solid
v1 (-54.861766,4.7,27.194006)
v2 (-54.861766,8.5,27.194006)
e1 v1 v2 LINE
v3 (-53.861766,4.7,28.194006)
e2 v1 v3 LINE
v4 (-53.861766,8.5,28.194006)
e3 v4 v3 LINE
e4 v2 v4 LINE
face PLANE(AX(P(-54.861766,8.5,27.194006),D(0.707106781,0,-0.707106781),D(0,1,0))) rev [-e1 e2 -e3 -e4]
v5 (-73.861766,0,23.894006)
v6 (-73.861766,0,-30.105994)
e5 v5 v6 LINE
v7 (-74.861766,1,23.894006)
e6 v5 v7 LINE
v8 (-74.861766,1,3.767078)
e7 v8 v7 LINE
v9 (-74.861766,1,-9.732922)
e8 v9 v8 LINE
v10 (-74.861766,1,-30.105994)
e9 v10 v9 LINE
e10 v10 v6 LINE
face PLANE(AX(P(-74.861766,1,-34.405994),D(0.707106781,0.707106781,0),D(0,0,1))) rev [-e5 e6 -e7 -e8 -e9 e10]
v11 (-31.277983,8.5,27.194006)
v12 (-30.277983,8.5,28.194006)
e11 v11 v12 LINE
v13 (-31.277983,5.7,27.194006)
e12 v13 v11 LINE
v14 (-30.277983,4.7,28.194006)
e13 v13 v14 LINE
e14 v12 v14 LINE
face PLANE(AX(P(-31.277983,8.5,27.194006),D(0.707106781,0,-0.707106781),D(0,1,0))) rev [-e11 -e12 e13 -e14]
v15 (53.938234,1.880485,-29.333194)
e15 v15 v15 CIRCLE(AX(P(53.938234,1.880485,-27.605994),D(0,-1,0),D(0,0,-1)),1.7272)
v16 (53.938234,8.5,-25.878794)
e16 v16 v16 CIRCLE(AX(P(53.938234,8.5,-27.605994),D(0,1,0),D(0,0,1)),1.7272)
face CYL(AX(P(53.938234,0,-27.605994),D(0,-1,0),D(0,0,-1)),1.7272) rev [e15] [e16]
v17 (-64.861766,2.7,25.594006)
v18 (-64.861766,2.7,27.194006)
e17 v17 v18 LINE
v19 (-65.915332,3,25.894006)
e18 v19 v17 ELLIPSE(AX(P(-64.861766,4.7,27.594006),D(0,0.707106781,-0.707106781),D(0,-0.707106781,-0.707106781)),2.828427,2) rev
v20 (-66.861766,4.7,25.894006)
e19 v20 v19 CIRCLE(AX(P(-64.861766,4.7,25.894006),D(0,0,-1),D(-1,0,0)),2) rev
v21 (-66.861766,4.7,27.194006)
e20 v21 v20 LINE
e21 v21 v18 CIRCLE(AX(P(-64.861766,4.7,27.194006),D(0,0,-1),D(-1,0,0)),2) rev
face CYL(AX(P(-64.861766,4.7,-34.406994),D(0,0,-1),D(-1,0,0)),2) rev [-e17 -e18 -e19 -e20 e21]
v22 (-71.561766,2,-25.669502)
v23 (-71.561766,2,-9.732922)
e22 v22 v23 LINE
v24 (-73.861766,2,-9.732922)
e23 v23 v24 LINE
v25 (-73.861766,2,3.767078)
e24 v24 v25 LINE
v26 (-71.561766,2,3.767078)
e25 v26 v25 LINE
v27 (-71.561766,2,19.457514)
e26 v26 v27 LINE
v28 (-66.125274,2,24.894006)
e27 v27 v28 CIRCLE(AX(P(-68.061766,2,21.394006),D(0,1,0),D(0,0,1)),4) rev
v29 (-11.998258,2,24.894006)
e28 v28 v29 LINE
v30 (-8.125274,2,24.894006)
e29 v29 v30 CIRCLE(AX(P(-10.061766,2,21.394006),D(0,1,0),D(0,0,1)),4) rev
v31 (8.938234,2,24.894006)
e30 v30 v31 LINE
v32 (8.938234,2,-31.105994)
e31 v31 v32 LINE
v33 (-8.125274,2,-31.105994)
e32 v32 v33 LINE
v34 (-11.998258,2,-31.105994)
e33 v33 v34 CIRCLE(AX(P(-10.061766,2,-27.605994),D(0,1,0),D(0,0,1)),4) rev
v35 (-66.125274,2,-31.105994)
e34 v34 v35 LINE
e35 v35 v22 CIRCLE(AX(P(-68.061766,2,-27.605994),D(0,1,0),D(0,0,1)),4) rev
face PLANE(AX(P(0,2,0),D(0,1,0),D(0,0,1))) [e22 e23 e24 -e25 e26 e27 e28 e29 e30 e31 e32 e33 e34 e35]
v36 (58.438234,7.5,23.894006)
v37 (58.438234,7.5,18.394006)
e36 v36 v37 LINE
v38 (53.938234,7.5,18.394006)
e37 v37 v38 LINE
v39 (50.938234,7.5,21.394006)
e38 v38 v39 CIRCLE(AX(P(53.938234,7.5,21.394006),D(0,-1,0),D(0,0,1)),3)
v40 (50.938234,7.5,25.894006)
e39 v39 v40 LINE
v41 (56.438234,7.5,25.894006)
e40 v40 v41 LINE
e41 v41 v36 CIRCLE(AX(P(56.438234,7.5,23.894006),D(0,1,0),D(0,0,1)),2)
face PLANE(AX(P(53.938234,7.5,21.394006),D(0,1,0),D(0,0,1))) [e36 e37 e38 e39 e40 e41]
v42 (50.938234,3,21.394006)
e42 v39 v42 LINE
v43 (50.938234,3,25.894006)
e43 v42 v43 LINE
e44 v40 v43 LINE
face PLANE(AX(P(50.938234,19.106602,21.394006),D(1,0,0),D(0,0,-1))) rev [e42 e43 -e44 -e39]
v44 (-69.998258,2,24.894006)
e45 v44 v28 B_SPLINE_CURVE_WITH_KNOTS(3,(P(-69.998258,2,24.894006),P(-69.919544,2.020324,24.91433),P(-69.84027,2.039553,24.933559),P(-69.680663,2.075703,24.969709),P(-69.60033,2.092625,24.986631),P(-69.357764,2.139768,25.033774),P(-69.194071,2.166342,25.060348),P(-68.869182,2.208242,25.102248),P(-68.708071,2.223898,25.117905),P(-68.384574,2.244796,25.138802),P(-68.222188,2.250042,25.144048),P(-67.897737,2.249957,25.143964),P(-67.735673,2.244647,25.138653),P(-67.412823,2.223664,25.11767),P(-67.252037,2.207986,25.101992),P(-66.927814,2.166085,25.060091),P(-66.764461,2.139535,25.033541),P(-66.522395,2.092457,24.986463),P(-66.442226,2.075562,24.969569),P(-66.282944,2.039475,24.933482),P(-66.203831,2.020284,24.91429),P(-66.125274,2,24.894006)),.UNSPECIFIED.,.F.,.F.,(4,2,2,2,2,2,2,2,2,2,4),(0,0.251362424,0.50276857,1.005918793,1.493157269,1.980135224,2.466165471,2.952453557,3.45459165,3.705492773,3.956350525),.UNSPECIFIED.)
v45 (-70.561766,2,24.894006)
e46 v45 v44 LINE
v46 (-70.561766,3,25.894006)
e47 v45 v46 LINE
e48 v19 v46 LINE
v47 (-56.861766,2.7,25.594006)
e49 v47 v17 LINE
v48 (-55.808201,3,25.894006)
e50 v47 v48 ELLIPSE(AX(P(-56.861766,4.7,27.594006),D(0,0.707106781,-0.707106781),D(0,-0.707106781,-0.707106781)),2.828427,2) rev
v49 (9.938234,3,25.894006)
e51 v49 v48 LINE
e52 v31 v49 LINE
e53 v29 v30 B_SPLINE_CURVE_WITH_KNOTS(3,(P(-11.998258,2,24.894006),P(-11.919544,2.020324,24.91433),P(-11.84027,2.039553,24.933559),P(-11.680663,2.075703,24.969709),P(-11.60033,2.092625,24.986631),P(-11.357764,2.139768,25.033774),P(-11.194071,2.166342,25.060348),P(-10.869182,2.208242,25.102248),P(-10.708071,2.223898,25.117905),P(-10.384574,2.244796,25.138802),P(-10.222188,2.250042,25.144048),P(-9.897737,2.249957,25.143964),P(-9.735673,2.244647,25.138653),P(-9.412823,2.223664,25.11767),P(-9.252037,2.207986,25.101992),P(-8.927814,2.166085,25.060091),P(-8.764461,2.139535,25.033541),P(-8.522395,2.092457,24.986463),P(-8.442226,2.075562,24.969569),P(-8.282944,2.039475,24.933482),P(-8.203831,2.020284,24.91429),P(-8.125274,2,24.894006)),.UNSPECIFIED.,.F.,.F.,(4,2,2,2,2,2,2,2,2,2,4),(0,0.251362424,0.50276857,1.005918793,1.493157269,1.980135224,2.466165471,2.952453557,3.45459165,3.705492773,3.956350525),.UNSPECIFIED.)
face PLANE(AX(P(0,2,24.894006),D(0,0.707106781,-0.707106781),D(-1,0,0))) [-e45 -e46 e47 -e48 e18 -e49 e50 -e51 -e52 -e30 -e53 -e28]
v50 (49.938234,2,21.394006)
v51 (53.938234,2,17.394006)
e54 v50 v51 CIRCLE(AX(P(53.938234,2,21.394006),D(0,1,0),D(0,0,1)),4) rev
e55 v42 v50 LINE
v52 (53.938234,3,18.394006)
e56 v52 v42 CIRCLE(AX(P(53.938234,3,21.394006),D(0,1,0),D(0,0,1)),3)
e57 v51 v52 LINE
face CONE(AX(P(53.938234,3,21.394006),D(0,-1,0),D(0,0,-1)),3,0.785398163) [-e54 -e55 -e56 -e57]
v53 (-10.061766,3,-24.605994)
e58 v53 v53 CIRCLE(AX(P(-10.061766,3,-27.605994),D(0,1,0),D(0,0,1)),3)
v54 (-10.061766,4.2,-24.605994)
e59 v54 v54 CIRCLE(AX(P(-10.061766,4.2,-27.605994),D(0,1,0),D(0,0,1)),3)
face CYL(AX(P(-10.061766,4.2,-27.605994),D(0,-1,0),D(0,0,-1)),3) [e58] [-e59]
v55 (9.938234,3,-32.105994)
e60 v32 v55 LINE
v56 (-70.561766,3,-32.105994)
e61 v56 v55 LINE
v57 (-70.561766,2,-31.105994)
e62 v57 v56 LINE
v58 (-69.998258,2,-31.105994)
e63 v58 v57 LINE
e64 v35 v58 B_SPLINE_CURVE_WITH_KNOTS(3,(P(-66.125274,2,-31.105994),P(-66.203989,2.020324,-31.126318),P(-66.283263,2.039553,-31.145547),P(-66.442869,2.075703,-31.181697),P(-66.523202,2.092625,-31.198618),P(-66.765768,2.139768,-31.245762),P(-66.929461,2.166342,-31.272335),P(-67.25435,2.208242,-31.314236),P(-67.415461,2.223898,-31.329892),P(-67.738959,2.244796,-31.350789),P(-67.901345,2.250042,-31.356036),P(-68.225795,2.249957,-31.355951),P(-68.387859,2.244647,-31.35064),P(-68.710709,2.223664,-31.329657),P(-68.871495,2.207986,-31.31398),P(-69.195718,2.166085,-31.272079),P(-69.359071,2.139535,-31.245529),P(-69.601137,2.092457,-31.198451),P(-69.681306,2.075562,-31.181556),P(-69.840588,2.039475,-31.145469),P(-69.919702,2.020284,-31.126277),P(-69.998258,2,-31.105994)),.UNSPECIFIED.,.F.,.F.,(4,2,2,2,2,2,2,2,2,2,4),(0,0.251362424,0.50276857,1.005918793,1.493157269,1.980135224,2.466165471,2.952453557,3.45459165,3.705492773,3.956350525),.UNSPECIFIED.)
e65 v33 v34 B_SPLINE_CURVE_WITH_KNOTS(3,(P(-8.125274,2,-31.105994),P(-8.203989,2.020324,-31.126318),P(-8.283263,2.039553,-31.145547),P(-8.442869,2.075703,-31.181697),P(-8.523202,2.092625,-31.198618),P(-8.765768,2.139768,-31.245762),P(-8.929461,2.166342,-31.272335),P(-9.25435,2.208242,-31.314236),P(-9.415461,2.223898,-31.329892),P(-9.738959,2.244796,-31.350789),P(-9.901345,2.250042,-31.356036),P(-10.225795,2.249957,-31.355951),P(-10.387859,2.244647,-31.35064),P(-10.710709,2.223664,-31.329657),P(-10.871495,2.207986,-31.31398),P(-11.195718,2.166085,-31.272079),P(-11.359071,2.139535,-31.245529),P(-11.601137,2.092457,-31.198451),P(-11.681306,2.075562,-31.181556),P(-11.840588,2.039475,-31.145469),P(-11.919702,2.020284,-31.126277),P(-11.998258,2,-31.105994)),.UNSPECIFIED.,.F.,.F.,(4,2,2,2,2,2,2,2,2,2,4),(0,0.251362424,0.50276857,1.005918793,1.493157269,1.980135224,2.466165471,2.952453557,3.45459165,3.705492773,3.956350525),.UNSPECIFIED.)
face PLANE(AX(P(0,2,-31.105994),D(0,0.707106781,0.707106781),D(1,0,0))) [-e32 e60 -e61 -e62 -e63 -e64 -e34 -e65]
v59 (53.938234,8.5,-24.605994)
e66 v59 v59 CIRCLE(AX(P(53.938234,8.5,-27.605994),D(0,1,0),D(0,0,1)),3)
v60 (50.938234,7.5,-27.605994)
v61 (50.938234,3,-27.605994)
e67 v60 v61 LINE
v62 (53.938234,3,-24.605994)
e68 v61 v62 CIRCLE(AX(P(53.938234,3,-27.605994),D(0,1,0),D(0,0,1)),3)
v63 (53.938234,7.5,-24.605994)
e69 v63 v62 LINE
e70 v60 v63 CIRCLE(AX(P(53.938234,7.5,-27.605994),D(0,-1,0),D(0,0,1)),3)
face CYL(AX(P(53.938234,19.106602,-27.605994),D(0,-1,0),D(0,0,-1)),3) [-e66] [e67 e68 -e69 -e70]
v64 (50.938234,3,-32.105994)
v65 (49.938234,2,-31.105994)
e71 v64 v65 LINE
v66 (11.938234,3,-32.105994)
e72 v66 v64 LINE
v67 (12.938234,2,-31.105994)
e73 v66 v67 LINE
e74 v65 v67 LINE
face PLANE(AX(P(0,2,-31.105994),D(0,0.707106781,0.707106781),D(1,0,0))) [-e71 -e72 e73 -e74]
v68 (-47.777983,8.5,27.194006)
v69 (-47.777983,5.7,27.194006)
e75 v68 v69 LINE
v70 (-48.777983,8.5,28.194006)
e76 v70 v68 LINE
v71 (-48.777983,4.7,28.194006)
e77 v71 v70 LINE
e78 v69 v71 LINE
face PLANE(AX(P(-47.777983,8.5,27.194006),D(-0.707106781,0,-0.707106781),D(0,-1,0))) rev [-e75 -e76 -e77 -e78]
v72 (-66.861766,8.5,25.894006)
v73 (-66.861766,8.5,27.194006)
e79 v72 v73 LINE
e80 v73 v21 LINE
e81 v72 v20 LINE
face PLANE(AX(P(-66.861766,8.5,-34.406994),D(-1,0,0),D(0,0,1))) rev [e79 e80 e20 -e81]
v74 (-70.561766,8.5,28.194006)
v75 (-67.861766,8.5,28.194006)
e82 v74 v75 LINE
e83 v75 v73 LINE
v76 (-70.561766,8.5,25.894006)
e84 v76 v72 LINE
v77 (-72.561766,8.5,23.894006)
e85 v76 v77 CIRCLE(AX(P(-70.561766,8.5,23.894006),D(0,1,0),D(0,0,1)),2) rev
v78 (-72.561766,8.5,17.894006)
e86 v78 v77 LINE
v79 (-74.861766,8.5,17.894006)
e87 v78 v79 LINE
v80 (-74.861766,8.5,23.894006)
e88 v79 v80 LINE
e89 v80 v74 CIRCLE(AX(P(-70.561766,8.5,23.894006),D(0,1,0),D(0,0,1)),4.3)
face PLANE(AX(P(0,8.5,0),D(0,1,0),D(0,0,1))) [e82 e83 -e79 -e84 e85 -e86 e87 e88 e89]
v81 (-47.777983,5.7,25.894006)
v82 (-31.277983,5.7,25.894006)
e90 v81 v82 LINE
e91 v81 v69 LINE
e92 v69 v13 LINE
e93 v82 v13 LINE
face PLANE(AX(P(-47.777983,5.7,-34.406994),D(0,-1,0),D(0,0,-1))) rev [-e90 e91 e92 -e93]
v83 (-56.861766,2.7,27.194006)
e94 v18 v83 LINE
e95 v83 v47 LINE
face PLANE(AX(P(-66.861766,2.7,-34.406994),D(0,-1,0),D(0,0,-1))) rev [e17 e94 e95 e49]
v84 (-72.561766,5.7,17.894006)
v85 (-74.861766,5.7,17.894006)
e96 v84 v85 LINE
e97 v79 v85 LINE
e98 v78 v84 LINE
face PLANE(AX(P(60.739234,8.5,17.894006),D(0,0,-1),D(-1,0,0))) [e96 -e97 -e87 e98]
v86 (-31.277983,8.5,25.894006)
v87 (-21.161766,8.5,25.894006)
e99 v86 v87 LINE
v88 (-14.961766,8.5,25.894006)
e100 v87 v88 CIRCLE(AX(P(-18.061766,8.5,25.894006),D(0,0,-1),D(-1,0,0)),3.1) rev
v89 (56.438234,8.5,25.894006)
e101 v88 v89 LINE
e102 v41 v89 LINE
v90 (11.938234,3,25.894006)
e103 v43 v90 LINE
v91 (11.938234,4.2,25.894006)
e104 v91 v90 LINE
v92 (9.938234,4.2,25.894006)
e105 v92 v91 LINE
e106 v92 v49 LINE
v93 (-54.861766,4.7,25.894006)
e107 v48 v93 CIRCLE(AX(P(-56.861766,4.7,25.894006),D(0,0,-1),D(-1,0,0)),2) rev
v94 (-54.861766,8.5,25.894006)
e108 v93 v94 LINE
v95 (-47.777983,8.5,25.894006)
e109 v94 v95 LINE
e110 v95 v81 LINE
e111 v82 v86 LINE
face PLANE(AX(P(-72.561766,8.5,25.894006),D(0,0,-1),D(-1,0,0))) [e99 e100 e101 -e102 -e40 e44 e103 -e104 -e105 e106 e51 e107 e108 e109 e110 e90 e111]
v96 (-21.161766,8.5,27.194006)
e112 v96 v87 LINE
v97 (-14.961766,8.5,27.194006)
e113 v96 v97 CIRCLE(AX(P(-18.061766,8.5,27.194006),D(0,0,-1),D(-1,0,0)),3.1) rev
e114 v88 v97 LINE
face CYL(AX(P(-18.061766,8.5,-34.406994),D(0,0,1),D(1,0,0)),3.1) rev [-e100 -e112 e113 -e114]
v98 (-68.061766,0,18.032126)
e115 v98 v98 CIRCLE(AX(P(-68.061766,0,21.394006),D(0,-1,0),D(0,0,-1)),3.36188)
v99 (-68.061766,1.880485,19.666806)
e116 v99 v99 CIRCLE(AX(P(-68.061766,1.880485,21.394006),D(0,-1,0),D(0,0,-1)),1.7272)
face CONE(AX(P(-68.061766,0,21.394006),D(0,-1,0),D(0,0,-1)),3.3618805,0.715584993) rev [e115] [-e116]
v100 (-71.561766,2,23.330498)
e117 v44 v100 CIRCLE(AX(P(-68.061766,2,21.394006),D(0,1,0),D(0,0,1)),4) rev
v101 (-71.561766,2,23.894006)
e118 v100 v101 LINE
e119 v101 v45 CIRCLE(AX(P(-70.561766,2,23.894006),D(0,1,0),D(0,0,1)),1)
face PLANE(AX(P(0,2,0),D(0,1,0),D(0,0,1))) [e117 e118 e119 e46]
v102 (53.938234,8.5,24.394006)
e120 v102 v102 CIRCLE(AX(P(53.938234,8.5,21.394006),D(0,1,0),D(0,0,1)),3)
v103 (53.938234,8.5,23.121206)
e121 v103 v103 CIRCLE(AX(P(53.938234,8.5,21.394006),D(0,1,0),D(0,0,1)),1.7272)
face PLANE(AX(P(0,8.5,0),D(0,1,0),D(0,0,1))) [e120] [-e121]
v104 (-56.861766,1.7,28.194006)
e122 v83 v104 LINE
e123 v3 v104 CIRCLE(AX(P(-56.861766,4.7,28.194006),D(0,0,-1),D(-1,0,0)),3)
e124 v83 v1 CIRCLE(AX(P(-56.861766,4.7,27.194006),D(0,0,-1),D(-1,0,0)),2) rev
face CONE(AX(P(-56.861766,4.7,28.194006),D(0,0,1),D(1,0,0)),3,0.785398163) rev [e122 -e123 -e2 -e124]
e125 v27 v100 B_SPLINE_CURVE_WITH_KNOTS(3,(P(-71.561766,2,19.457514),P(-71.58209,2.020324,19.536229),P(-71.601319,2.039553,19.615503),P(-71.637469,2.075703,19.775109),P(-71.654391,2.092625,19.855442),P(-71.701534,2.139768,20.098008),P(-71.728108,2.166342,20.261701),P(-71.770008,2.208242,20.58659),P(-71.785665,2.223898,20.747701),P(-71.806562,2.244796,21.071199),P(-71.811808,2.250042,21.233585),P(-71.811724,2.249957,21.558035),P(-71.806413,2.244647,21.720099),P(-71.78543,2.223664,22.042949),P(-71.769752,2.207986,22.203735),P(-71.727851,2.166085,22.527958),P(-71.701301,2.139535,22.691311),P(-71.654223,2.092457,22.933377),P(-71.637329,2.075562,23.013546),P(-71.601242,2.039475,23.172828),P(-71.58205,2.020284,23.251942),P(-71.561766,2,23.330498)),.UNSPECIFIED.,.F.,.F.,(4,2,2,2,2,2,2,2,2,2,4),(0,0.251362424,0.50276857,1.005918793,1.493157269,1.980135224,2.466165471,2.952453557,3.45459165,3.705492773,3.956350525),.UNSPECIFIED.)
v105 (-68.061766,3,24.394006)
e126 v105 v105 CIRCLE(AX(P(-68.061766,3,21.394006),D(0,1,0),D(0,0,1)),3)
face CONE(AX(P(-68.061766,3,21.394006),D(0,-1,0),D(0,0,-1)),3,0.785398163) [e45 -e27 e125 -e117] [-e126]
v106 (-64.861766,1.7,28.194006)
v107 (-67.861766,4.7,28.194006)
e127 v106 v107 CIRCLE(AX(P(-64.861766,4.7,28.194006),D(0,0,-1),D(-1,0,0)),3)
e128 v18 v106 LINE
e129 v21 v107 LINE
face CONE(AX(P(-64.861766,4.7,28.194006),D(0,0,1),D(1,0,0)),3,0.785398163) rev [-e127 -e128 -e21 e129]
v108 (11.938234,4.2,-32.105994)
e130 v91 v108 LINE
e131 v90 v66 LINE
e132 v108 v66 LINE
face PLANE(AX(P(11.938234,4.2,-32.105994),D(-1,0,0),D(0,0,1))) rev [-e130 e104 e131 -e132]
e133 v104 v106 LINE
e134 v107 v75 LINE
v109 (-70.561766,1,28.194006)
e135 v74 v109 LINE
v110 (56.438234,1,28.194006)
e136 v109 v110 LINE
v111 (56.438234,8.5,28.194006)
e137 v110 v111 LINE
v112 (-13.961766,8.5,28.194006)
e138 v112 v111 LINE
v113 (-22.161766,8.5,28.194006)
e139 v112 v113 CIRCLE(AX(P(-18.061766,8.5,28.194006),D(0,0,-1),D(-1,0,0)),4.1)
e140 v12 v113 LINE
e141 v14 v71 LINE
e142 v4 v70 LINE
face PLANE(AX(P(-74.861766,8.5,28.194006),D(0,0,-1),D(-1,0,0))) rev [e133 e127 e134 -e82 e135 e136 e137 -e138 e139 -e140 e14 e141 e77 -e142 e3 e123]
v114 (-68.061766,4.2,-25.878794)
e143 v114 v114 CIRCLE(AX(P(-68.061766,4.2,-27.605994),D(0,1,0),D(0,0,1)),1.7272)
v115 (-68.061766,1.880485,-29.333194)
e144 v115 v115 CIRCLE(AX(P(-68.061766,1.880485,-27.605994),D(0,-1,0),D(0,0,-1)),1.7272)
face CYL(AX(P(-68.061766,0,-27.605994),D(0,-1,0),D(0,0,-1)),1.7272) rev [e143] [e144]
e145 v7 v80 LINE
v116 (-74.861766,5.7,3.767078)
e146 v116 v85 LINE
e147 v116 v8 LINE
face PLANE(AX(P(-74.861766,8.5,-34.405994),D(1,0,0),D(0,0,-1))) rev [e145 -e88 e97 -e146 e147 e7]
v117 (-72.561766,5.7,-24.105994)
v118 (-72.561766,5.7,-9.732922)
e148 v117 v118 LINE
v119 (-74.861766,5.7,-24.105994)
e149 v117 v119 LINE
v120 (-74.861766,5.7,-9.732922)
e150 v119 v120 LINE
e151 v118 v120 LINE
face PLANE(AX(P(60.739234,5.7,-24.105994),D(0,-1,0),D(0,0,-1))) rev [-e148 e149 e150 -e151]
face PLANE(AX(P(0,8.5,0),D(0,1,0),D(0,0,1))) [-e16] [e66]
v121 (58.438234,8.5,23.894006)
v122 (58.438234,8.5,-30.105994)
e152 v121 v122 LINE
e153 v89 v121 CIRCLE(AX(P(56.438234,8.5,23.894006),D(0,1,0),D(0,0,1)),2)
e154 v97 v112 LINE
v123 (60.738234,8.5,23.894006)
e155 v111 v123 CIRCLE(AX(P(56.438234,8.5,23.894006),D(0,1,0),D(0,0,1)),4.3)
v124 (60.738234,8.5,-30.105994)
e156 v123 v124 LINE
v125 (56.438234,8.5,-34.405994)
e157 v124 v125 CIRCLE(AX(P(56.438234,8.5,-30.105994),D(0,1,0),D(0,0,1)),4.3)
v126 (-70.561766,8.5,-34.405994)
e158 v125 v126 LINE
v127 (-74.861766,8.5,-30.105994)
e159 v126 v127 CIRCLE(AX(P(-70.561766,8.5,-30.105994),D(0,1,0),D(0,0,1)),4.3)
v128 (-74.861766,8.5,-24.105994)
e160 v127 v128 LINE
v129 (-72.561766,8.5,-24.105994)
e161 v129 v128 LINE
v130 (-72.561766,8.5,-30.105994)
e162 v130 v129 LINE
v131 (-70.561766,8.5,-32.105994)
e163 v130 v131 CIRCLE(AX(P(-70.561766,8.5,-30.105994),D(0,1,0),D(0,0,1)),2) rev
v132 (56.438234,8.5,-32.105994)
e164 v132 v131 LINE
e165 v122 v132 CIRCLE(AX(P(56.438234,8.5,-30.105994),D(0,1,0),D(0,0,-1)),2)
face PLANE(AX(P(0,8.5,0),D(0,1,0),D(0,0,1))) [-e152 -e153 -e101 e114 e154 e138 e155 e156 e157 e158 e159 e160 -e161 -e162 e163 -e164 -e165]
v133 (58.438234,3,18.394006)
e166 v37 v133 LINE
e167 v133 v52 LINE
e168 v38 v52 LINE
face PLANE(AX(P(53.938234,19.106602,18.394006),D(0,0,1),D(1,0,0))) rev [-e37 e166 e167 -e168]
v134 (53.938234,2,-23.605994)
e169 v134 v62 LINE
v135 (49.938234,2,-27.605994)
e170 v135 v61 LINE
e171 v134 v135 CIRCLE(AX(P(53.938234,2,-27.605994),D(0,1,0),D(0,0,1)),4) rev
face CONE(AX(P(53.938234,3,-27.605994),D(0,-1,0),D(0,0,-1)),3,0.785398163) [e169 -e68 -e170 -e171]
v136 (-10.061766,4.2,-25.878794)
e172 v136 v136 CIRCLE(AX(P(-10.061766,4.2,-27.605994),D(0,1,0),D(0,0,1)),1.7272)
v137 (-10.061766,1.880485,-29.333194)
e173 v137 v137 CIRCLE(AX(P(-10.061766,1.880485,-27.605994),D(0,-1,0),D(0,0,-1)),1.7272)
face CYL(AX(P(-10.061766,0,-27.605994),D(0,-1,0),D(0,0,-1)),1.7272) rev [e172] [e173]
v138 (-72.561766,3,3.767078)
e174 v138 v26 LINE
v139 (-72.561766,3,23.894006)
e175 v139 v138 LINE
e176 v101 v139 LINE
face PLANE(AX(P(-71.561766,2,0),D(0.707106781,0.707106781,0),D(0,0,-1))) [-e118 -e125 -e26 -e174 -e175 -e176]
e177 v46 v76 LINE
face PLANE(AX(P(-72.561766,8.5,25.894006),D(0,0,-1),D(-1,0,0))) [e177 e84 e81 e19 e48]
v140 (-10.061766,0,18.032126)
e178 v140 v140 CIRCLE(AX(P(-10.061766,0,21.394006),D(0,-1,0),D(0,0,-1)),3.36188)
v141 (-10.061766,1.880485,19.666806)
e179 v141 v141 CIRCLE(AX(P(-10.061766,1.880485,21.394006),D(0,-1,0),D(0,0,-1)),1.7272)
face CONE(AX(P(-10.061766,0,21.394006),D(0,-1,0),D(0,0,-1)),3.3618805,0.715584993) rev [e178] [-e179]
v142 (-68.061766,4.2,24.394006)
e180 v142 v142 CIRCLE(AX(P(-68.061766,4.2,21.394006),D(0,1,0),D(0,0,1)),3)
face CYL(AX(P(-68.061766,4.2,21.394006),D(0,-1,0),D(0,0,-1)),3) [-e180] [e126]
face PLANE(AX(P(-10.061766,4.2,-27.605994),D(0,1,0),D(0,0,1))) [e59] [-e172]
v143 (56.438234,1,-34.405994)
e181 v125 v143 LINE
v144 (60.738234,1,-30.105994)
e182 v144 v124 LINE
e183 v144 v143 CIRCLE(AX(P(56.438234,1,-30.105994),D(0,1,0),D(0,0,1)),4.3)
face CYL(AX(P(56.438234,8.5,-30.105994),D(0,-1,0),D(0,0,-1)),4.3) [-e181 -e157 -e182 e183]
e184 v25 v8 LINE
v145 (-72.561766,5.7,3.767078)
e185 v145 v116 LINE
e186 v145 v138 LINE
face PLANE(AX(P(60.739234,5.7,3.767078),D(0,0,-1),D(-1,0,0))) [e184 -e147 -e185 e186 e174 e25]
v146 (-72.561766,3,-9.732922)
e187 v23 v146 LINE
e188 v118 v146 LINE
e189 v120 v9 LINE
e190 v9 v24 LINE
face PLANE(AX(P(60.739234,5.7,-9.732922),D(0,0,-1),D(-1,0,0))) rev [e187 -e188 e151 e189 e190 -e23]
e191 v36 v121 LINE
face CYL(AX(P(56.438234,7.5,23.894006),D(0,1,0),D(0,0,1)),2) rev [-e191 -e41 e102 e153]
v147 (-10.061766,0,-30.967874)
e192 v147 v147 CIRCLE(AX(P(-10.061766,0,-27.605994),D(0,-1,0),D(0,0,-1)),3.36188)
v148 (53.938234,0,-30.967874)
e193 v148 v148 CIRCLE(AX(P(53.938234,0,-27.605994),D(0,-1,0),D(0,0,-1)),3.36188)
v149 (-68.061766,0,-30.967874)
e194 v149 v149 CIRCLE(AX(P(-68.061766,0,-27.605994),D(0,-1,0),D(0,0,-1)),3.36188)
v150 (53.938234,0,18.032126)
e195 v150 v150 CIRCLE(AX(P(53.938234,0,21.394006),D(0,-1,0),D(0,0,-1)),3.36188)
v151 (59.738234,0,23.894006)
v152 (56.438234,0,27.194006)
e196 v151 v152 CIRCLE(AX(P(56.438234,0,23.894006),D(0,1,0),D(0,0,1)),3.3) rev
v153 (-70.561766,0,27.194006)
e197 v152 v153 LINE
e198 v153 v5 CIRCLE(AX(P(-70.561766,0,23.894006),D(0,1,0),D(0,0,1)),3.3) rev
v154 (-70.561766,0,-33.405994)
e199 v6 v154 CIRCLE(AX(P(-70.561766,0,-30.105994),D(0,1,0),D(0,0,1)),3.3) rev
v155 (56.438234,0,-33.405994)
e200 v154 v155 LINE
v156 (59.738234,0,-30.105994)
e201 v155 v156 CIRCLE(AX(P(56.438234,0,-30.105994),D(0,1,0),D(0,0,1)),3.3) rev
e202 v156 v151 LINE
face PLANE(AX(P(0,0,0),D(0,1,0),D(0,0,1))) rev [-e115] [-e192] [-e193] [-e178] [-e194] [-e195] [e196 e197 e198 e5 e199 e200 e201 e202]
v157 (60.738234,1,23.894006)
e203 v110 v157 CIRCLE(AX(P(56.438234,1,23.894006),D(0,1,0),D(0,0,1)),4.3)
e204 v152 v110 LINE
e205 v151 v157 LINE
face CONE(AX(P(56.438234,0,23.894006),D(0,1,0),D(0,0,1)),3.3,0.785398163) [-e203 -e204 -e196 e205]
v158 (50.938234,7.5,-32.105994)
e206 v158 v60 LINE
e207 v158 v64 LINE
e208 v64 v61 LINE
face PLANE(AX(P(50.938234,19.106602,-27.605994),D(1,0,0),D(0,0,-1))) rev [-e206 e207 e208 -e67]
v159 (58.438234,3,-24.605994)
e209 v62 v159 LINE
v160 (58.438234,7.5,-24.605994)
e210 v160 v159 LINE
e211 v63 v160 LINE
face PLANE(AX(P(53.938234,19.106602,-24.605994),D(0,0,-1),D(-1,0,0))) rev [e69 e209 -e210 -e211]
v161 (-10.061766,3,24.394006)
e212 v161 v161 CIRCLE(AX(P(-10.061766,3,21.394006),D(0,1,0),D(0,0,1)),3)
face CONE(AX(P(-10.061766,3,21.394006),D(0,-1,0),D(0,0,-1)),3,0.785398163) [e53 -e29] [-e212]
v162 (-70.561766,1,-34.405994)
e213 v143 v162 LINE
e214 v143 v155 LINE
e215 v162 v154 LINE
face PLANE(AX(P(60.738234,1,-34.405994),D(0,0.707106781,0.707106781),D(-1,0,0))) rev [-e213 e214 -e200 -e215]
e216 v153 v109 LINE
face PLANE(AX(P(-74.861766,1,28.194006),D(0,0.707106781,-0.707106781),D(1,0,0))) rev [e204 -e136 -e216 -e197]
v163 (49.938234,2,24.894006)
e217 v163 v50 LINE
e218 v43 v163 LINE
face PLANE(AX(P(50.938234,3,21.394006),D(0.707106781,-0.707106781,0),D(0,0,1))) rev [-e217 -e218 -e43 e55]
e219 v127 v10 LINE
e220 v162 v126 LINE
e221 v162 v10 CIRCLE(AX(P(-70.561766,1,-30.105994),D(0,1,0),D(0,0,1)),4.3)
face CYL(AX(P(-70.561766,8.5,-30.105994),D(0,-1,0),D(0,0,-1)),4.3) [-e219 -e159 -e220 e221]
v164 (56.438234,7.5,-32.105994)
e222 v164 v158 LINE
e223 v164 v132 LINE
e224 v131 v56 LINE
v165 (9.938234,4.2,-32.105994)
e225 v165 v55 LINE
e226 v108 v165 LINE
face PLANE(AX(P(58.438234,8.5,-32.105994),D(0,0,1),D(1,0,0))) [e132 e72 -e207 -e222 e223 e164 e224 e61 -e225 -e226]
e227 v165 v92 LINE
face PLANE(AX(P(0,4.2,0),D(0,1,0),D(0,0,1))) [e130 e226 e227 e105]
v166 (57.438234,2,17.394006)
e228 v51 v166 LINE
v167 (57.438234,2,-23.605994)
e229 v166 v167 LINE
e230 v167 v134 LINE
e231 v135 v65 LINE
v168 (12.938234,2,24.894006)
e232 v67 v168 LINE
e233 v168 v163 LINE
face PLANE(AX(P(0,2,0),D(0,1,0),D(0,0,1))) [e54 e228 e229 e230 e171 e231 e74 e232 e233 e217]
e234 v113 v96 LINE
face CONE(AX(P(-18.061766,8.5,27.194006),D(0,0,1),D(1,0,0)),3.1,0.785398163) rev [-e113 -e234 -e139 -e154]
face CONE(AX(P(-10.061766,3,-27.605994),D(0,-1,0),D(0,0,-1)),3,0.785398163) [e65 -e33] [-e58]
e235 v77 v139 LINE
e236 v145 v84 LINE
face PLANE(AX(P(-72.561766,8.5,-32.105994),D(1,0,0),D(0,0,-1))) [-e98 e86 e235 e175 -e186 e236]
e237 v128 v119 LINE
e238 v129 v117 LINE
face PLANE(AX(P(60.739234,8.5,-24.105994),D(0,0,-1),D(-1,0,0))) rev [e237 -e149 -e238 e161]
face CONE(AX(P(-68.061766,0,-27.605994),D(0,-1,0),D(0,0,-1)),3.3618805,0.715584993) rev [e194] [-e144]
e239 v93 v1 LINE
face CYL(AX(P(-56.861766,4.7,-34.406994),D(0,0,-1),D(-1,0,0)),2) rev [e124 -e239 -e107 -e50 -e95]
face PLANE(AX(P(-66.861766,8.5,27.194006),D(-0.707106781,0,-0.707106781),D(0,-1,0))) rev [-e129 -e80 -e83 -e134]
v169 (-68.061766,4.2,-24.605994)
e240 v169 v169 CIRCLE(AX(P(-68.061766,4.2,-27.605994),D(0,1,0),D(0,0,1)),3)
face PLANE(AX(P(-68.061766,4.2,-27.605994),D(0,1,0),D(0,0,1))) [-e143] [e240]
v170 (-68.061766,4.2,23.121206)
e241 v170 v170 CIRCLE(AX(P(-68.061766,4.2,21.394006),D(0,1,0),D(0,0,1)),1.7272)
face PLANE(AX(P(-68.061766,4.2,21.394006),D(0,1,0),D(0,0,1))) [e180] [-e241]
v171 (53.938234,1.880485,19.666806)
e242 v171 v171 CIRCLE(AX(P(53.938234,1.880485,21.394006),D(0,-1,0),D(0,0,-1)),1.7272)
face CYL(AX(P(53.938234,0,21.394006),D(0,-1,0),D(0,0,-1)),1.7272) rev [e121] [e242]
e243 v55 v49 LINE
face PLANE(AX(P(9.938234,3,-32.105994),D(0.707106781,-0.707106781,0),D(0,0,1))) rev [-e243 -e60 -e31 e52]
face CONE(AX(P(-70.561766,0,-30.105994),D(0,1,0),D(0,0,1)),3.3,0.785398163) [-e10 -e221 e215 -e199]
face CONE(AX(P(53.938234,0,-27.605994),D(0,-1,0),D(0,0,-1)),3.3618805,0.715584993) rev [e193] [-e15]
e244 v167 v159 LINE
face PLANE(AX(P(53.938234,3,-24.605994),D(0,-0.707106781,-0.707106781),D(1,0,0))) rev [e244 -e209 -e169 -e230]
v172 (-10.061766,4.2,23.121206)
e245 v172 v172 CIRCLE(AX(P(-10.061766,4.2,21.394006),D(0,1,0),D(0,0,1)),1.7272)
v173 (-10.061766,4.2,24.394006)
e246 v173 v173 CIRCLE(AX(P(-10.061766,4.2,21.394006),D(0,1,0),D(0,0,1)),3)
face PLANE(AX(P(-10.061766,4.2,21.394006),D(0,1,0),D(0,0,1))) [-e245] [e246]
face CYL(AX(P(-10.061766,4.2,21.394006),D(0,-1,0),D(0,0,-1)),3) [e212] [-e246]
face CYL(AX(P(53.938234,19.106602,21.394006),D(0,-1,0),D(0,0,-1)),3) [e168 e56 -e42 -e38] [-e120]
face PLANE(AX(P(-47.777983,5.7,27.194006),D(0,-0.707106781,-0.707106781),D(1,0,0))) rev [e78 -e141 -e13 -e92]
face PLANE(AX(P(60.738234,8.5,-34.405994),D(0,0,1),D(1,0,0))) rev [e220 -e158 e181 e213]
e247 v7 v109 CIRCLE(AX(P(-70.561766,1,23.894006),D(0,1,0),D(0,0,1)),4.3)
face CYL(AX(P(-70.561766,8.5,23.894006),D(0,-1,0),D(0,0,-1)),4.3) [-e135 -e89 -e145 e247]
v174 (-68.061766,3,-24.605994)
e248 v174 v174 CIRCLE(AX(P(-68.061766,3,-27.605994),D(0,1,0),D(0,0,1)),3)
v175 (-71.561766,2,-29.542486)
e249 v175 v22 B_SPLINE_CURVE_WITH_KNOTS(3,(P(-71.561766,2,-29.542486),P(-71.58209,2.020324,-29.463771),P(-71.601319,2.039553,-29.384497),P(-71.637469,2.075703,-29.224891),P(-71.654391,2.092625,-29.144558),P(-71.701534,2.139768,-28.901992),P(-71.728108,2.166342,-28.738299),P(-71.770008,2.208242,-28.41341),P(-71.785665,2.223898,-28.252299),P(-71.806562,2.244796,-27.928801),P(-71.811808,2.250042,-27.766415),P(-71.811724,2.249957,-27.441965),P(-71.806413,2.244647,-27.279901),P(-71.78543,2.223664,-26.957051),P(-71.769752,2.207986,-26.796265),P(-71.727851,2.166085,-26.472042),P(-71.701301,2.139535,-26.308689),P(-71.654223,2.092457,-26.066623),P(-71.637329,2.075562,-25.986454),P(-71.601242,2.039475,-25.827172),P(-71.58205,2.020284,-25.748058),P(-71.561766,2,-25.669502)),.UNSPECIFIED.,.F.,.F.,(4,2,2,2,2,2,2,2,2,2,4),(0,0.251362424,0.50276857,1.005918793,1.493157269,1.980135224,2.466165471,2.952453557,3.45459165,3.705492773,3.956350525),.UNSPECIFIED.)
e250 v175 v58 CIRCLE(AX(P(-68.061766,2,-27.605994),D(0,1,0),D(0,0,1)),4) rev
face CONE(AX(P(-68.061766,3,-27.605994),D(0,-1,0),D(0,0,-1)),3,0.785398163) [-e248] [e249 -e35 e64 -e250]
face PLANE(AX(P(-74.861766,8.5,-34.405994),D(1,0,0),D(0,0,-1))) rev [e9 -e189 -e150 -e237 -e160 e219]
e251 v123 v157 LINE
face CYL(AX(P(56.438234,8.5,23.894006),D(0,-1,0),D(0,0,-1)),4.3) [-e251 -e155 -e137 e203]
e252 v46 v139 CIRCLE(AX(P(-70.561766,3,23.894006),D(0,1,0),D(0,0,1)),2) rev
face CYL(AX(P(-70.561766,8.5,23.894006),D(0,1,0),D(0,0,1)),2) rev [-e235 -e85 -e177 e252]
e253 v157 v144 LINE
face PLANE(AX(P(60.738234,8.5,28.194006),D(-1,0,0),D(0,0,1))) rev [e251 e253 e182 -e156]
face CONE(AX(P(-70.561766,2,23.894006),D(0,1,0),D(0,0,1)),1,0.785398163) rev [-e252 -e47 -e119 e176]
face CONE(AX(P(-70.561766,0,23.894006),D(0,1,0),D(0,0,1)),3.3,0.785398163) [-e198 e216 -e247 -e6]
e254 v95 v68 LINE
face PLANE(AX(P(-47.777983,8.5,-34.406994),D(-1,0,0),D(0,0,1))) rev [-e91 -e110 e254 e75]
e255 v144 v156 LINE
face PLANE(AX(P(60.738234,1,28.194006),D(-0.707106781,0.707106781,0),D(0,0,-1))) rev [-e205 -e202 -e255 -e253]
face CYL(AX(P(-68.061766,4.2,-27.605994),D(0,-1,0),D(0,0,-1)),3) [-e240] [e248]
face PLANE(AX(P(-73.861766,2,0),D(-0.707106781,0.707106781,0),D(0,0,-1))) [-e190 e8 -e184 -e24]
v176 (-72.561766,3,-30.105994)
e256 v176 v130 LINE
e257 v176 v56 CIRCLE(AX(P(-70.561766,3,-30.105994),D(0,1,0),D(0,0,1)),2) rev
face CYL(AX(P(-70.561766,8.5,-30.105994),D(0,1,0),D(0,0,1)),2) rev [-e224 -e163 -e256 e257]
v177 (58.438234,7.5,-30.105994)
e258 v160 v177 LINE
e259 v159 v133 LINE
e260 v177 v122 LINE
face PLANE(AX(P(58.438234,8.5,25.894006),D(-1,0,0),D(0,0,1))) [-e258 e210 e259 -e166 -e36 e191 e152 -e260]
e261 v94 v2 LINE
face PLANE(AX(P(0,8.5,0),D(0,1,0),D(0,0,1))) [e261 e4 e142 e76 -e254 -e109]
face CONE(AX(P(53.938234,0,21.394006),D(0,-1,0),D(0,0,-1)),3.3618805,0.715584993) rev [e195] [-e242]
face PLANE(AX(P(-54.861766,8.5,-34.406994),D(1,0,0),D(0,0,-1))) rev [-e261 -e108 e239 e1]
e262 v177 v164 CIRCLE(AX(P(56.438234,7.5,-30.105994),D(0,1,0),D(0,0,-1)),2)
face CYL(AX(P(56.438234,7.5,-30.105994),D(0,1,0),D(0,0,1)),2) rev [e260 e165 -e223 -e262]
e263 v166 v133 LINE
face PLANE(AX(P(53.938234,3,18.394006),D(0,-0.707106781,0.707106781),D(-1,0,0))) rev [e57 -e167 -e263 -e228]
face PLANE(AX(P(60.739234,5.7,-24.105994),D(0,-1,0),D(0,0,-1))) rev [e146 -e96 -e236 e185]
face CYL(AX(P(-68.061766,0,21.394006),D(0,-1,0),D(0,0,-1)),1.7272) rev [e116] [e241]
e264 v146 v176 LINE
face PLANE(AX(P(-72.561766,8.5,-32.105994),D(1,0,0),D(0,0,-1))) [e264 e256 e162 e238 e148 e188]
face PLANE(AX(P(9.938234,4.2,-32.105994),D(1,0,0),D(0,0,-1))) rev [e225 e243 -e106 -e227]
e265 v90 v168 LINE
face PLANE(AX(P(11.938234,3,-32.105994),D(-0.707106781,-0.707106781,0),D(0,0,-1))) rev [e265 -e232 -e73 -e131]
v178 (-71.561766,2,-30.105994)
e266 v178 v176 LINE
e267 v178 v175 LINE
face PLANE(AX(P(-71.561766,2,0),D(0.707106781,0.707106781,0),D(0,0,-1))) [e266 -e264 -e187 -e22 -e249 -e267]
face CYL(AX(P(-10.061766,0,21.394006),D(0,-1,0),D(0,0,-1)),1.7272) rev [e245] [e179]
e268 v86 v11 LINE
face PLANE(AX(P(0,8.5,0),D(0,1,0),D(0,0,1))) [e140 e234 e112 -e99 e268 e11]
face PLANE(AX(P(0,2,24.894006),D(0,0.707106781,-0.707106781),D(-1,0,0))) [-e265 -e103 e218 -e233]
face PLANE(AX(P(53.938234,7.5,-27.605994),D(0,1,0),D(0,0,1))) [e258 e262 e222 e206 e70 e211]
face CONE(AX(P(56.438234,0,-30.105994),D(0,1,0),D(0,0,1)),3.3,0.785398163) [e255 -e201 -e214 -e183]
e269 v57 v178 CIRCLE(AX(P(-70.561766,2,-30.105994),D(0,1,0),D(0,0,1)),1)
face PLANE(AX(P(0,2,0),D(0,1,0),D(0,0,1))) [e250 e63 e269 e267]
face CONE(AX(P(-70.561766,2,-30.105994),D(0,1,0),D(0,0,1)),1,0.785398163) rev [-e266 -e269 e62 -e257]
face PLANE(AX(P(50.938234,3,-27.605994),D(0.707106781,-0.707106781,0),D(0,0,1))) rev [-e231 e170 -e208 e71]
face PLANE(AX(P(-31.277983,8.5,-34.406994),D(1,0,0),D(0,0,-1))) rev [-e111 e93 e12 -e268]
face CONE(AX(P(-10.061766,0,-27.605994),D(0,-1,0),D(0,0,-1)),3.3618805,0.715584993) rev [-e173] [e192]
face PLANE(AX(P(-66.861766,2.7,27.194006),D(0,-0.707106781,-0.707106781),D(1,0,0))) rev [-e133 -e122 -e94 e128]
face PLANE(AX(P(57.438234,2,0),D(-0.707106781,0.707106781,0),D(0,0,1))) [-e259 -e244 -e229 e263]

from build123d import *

# Parameters (mm, degrees)
SKETCH3_W                                         = 135.6
SKETCH3_H                                         = 62.6
SKETCH3_W_2                                       = 131
SKETCH3_H_2                                       = 58
BOSS_EXTRUDE1_DEPTH                               = 8.5
SKETCH5_W                                         = 131
SKETCH5_H                                         = 58
BOSS_EXTRUDE2_DEPTH                               = 2
SKETCH6_R                                         = 3
BOSS_EXTRUDE3_DEPTH                               = 2.2
SKETCH10_W                                        = 2
SKETCH10_H                                        = 58
BOSS_EXTRUDE4_DEPTH                               = 2.2
CUT_EXTRUDE1_REACH                                = 99.956
SKETCH11_R                                        = 3.1
SKETCH11_W                                        = 12
SKETCH11_H                                        = 5.8
SKETCH11_W_2                                      = 16.5
SKETCH11_H_2                                      = 2.8
CUT_EXTRUDE2_REACH                                = 142.155
SKETCH12_W                                        = 42
SKETCH12_H                                        = 2.8
SKETCH12_W_2                                      = 13.5
SKETCH12_H_2                                      = 3.7
FILLET6_R                                         = 2
FILLET8_R                                         = 2
CHAMFER1_SIZE                                     = 1
BOSS_EXTRUDE7_DEPTH                               = 6.5
FILLET20_R                                        = 4.3
CHAMFER5_SIZE                                     = 1
CSK_FOR_4_FLAT_HEAD_SOCKET_CAP_SCREW1_D           = 3.4544
CSK_FOR_4_FLAT_HEAD_SOCKET_CAP_SCREW1_DEPTH       = 14
CSK_FOR_4_FLAT_HEAD_SOCKET_CAP_SCREW1_CSINK_D     = 6.723761
CSK_FOR_4_FLAT_HEAD_SOCKET_CAP_SCREW1_CSINK_ANGLE = 82
CSK_FOR_4_FLAT_HEAD_SOCKET_CAP_SCREW1_TIP         = 1.037806461
CHAMFER7_SIZE                                     = 1
CHAMFER8_SIZE                                     = 1
CUT_EXTRUDE3_START                                = -1
CUT_EXTRUDE3_DEPTH                                = 1
FILLET21_R                                        = 2
CHAMFER9_SIZE                                     = 1


# Some blends are built 0.0001 mm under size
with BuildPart() as part:
    # Sketch3 → Boss-Extrude1 (new body)
    with BuildSketch(Plane(origin=(0, 0, 0), x_dir=(1, 0, 0), z_dir=(0, 1, 0))):
        with Locations((-7.061766162, 3.105993834)):
            Rectangle(SKETCH3_W, SKETCH3_H)
        with Locations((-7.061766162, 3.105993834)):
            Rectangle(SKETCH3_W_2, SKETCH3_H_2, mode=Mode.SUBTRACT)
    extrude(amount=BOSS_EXTRUDE1_DEPTH)

    # Sketch5 → Boss-Extrude2 (add)
    with BuildSketch(Plane(origin=(0, 0, 0), x_dir=(1, 0, 0), z_dir=(0, 1, 0))):
        with Locations((-7.061766162, 3.105993834)):
            Rectangle(SKETCH5_W, SKETCH5_H)
    extrude(amount=BOSS_EXTRUDE2_DEPTH)

    # Sketch6 → Boss-Extrude3 (add)
    with BuildSketch(Plane(origin=(0, 2, 0), x_dir=(1, 0, 0), z_dir=(0, 1, 0))):
        with Locations(Location((-68.061766162, 27.605993834, 0), (0, 0, 270))):
            Circle(SKETCH6_R)
        with Locations(Location((-68.061766162, -21.394006166, 0), (0, 0, 270))):
            Circle(SKETCH6_R)
        with Locations(Location((-10.061766162, -21.394006166, 0), (0, 0, 270))):
            Circle(SKETCH6_R)
        with Locations(Location((-10.061766162, 27.605993834, 0), (0, 0, 270))):
            Circle(SKETCH6_R)
    extrude(amount=BOSS_EXTRUDE3_DEPTH)

    # Sketch10 → Boss-Extrude4 (add)
    with BuildSketch(Plane(origin=(0, 2, 0), x_dir=(1, 0, 0), z_dir=(0, 1, 0))):
        with Locations((10.938233838, 3.105993834)):
            Rectangle(SKETCH10_W, SKETCH10_H)
    extrude(amount=BOSS_EXTRUDE4_DEPTH)

    # Sketch11 → Cut-Extrude1 (cut, up to next)
    with BuildSketch(Plane.XY.offset(28.194006166), mode=Mode.PRIVATE) as cut_extrude1_sk1:
        with Locations((-18.061766162, 8.5)):
            Circle(SKETCH11_R)
    cut_extrude1_tool1 = extrude(cut_extrude1_sk1.sketch, amount=-CUT_EXTRUDE1_REACH, mode=Mode.PRIVATE) & part.part
    # Sketch11 → Cut-Extrude1 (cut, up to next)
    with BuildSketch(Plane.XY.offset(28.194006166), mode=Mode.PRIVATE) as cut_extrude1_sk2:
        with Locations((-60.861766162, 5.6)):
            Rectangle(SKETCH11_W, SKETCH11_H)
    cut_extrude1_tool2 = extrude(cut_extrude1_sk2.sketch, amount=-CUT_EXTRUDE1_REACH, mode=Mode.PRIVATE) & part.part
    # Sketch11 → Cut-Extrude1 (cut, up to next)
    with BuildSketch(Plane.XY.offset(28.194006166), mode=Mode.PRIVATE) as cut_extrude1_sk3:
        with Locations((-39.527982648, 7.1)):
            Rectangle(SKETCH11_W_2, SKETCH11_H_2)
    cut_extrude1_tool3 = extrude(cut_extrude1_sk3.sketch, amount=-CUT_EXTRUDE1_REACH, mode=Mode.PRIVATE) & part.part
    add(cut_extrude1_tool1.solids().sort_by_distance((-18.061766, 8.5, 28.194006))[0], mode=Mode.SUBTRACT)
    add(cut_extrude1_tool2.solids().sort_by_distance((-60.861766, 5.6, 28.194006))[0], mode=Mode.SUBTRACT)
    add(cut_extrude1_tool3.solids().sort_by_distance((-39.527983, 7.1, 28.194006))[0], mode=Mode.SUBTRACT)

    # Sketch12 → Cut-Extrude2 (cut, up to next)
    with BuildSketch(Plane.ZY.offset(74.861766162), mode=Mode.PRIVATE) as cut_extrude2_sk1:
        with Locations((-3.105993834, 7.1)):
            Rectangle(SKETCH12_W, SKETCH12_H)
    cut_extrude2_tool1 = extrude(cut_extrude2_sk1.sketch, amount=-CUT_EXTRUDE2_REACH, mode=Mode.PRIVATE) & part.part
    # Sketch12 → Cut-Extrude2 (cut, up to next)
    with BuildSketch(Plane.ZY.offset(74.861766162), mode=Mode.PRIVATE) as cut_extrude2_sk2:
        with Locations((-2.982922372, 3.85)):
            Rectangle(SKETCH12_W_2, SKETCH12_H_2)
    cut_extrude2_tool2 = extrude(cut_extrude2_sk2.sketch, amount=-CUT_EXTRUDE2_REACH, mode=Mode.PRIVATE) & part.part
    add(cut_extrude2_tool1.solids().sort_by_distance((-74.861766, 7.1, -3.105994))[0], mode=Mode.SUBTRACT)
    add(cut_extrude2_tool2.solids().sort_by_distance((-74.861766, 3.85, -2.982922))[0], mode=Mode.SUBTRACT)

    # Fillet6
    fillet6_edges = [part.edges().sort_by_distance(p)[0] for p in [
        (58.438233838, 5.25, -32.105993834),
    ]]
    fillet(fillet6_edges, radius=FILLET6_R)

    # Fillet8
    fillet8_edges = [part.edges().sort_by_distance(p)[0] for p in [
        (-72.561766162, 5.25, -32.105993834),
        (-72.561766162, 5.25, 25.894006166),
    ]]
    fillet(fillet8_edges, radius=FILLET8_R)

    # Chamfer1
    chamfer1_edges = [part.edges().sort_by_distance(p)[0] for p in [
        (-68.061766162, 2, -30.605993834),
        (-68.061766162, 2, 18.394006166),
        (-10.061766162, 2, 18.394006166),
        (-10.061766162, 2, -30.605993834),
    ]]
    chamfer(chamfer1_edges, length=CHAMFER1_SIZE)

    # Sketch24 → Boss-Extrude7 (add)
    with BuildSketch(Plane(origin=(0, 2, 0), x_dir=(1, 0, 0), z_dir=(0, 1, 0))):
        with BuildLine():
            Line((53.938233838, -18.394006166), (58.438233838, -18.394006166))
            Line((58.438233838, -18.394006166), (58.438233838, -25.894006166))
            Line((58.438233838, -25.894006166), (50.938233838, -25.894006166))
            Line((50.938233838, -25.894006166), (50.938233838, -21.394006166))
            ThreePointArc((50.938233838, -21.394006166), (51.816913494, -19.272685822), (53.938233838, -18.394006166))
        make_face()
        with BuildLine():
            Line((50.938233838, 27.605993834), (50.938233838, 32.105993834))
            Line((50.938233838, 32.105993834), (58.438233838, 32.105993834))
            Line((58.438233838, 32.105993834), (58.438233838, 24.605993834))
            Line((58.438233838, 24.605993834), (53.938233838, 24.605993834))
            ThreePointArc((53.938233838, 24.605993834), (51.816913494, 25.484673491), (50.938233838, 27.605993834))
        make_face()
    extrude(amount=BOSS_EXTRUDE7_DEPTH)

    # Fillet20
    fillet20_edges = [part.edges().sort_by_distance(p)[0] for p in [
        (-74.861766162, 4.25, -34.405993834),
        (60.738233838, 4.25, -34.405993834),
        (60.738233838, 4.25, 28.194006166),
        (-74.861766162, 4.25, 28.194006166),
    ]]
    fillet(fillet20_edges, radius=FILLET20_R)

    # Chamfer5
    # the kernel refuses this chamfer: 1 mm, written as the material it adds along each edge
    with BuildSketch(Plane(origin=(-72.561766162, 2, 23.894006166), x_dir=(0.9996219169112968, -0.027495876610586605, 0), z_dir=(0, 0, -1))) as chamfer5_piece_1:
        Polygon((CHAMFER5_SIZE * 0.999621916911, -CHAMFER5_SIZE * 0.0274958766106), (-CHAMFER5_SIZE * 0.0274958766106, -CHAMFER5_SIZE * 0.999621916911), (0, 0), align=None)
    extrude(amount=20.126928538)
    with BuildSketch(Plane(origin=(-72.561766162, 2, -9.732922372), x_dir=(0.9996219169112968, -0.02749587661058639, 0), z_dir=(0, 0, -1))) as chamfer5_piece_2:
        Polygon((CHAMFER5_SIZE * 0.999621916911, -CHAMFER5_SIZE * 0.0274958766106), (-CHAMFER5_SIZE * 0.0274958766106, -CHAMFER5_SIZE * 0.999621916911), (0, 0), align=None)
    extrude(amount=20.373071462)
    with BuildSketch(Plane(origin=(-70.561766162, 2, 23.894006166), x_dir=(0, 0, 1), z_dir=(1, 0, 0))) as chamfer5_piece_3:
        Polygon((2 - CHAMFER5_SIZE, 0), (2, -CHAMFER5_SIZE), (2, 0), align=None)
    revolve(axis=Axis((-70.561766162, 2, 23.894006166), (0, -1, 0)), revolution_arc=90)
    with BuildSketch(Plane(origin=(-70.561766162, 2, -30.105993834), x_dir=(0, 0, -1), z_dir=(1, 0, 0))) as chamfer5_piece_4:
        Polygon((2 - CHAMFER5_SIZE, 0), (2, CHAMFER5_SIZE), (2, 0), align=None)
    revolve(axis=Axis((-70.561766162, 2, -30.105993834), (0, 1, 0)), revolution_arc=90)
    with BuildSketch(Plane(origin=(12.509916826, 2, 25.894006166), x_dir=(0, -0.027495876610586296, -0.9996219169112968), z_dir=(-1, 0, 0))) as chamfer5_piece_5_section:
        Polygon((CHAMFER5_SIZE * 0.999621916911, -CHAMFER5_SIZE * 0.0274958766106), (-CHAMFER5_SIZE * 0.0274958766106, -CHAMFER5_SIZE * 0.999621916911), (0, 0), align=None)
    chamfer5_piece_5 = extrude(amount=83.071682988, mode=Mode.PRIVATE)
    chamfer5_piece_5 = split(chamfer5_piece_5, bisect_by=Plane(origin=(12.224075332, 2.7, 25.537595909), z_dir=(0, -1, 0)), keep=Keep.TOP, mode=Mode.PRIVATE)
    add(chamfer5_piece_5)
    with BuildSketch(Plane(origin=(12.509916826, 2, 25.894006166), x_dir=(0, -0.027495876610586296, -0.9996219169112968), z_dir=(-1, 0, 0))) as chamfer5_piece_6_section:
        Polygon((CHAMFER5_SIZE * 0.999621916911, -CHAMFER5_SIZE * 0.0274958766106), (-CHAMFER5_SIZE * 0.0274958766106, -CHAMFER5_SIZE * 0.999621916911), (0, 0), align=None)
    chamfer5_piece_6 = extrude(amount=83.071682988, mode=Mode.PRIVATE)
    chamfer5_piece_6 = split(chamfer5_piece_6, bisect_by=Plane(origin=(-54.861766162, 2.8, 25.794006166), z_dir=(1, 0, 0)), keep=Keep.TOP, mode=Mode.PRIVATE)
    add(chamfer5_piece_6)
    with BuildSketch(Plane(origin=(12.509916826, 2, 25.894006166), x_dir=(0, -0.027495876610586296, -0.9996219169112968), z_dir=(-1, 0, 0))) as chamfer5_piece_7_section:
        Polygon((CHAMFER5_SIZE * 0.999621916911, -CHAMFER5_SIZE * 0.0274958766106), (-CHAMFER5_SIZE * 0.0274958766106, -CHAMFER5_SIZE * 0.999621916911), (0, 0), align=None)
    chamfer5_piece_7 = extrude(amount=83.071682988, mode=Mode.PRIVATE)
    chamfer5_piece_7 = split(chamfer5_piece_7, bisect_by=Plane(origin=(-66.861766162, 2.802568974, 25.79914411), z_dir=(-1, 0, 0)), keep=Keep.TOP, mode=Mode.PRIVATE)
    add(chamfer5_piece_7)
    with BuildSketch(Plane(origin=(-70.561766162, 2, -32.105993834), x_dir=(0, -0.027495876610586605, 0.9996219169112968), z_dir=(1, 0, 0))) as chamfer5_piece_8:
        Polygon((CHAMFER5_SIZE * 0.999621916911, -CHAMFER5_SIZE * 0.0274958766106), (-CHAMFER5_SIZE * 0.0274958766106, -CHAMFER5_SIZE * 0.999621916911), (0, 0), align=None)
    extrude(amount=83.071682988)
    with BuildSketch(Plane(origin=(9.938233838, 2, 25.894006166), x_dir=(-0.9996219169112968, -0.027495876610586556, 0), z_dir=(0, 0, -1))) as chamfer5_piece_9:
        Polygon((CHAMFER5_SIZE * 0.999621916911, CHAMFER5_SIZE * 0.0274958766106), (-CHAMFER5_SIZE * 0.0274958766106, CHAMFER5_SIZE * 0.999621916911), (0, 0), align=None)
    extrude(amount=58)
    with BuildSketch(Plane(origin=(11.938233838, 2, -32.105993834), x_dir=(-0.027495876610585623, 0.9996219169112968, 0), z_dir=(0, 0, 1))) as chamfer5_piece_10:
        Polygon((CHAMFER5_SIZE * 0.999621916911, -CHAMFER5_SIZE * 0.0274958766106), (-CHAMFER5_SIZE * 0.0274958766106, -CHAMFER5_SIZE * 0.999621916911), (0, 0), align=None)
    extrude(amount=58)
    with BuildSketch(Plane(origin=(9.36655085, 2, -32.105993834), x_dir=(0, 0.9996219169112968, -0.027495876610589075), z_dir=(1, 0, 0)), Plane(origin=(53.509916826, 2, 25.894006166), x_dir=(0, 0.9996219169112968, 0.027495876610585623), z_dir=(-1, 0, 0))) as chamfer5_piece_11:
        Polygon((CHAMFER5_SIZE * 0.999621916911, CHAMFER5_SIZE * 0.0274958766106), (-CHAMFER5_SIZE * 0.0274958766106, CHAMFER5_SIZE * 0.999621916911), (0, 0), align=None)
    extrude(amount=44.143365976)
    with BuildSketch(Plane(origin=(53.938233838, 2, 21.394006166), x_dir=(-1, 0, 0), z_dir=(0, 0, 1))) as chamfer5_piece_12:
        Polygon((3, -CHAMFER5_SIZE), (3 + CHAMFER5_SIZE, 0), (3, 0), align=None)
    revolve(axis=Axis((53.938233838, 2, 21.394006166), (0, -1, 0)), revolution_arc=90)
    with BuildSketch(Plane(origin=(58.438233838, 2, -27.177676822), x_dir=(0.02749587661058907, 0.9996219169112965, 0), z_dir=(0, 0, 1))) as chamfer5_piece_13:
        Polygon((CHAMFER5_SIZE * 0.999621916911, CHAMFER5_SIZE * 0.0274958766106), (-CHAMFER5_SIZE * 0.0274958766106, CHAMFER5_SIZE * 0.999621916911), (0, 0), align=None)
    extrude(amount=48.143365976)
    with BuildSketch(Plane(origin=(53.938233838, 2, -27.605993834), x_dir=(0, 0, 1), z_dir=(1, 0, 0))) as chamfer5_piece_14:
        Polygon((3, -CHAMFER5_SIZE), (3 + CHAMFER5_SIZE, 0), (3, 0), align=None)
    revolve(axis=Axis((53.938233838, 2, -27.605993834), (0, -1, 0)), revolution_arc=90)
    with BuildSketch(Plane(origin=(50.938233838, 2, 25.894006166), x_dir=(0.02749587661058907, 0.9996219169112965, 0), z_dir=(0, 0, -1)), Plane(origin=(53.938233838, 2, 18.394006166), x_dir=(0, 0.9996219169112968, 0.027495876610585623), z_dir=(1, 0, 0)), Plane(origin=(58.438233838, 2, -24.605993834), x_dir=(0, 0.9996219169112968, -0.027495876610585623), z_dir=(-1, 0, 0)), Plane(origin=(50.938233838, 2, -27.605993834), x_dir=(0.02749587661058907, 0.9996219169112965, 0), z_dir=(0, 0, -1))) as chamfer5_piece_15:
        Polygon((CHAMFER5_SIZE * 0.999621916911, -CHAMFER5_SIZE * 0.0274958766106), (-CHAMFER5_SIZE * 0.0274958766106, -CHAMFER5_SIZE * 0.999621916911), (0, 0), align=None)
    extrude(amount=4.5)

    # CSK for #4 Flat Head Socket Cap Screw1
    with Locations(Plane(origin=(0, 0, 0), x_dir=(-1, 0, 0), z_dir=(0, -1, 0))):
        with Locations((68.061766162, 27.605993834), (68.061766162, -21.394006166), (-53.938233838, 27.605993834), (-53.938233838, -21.394006166), (10.061766162, -21.394006166), (10.061766162, 27.605993834)):
            CounterSinkHole(CSK_FOR_4_FLAT_HEAD_SOCKET_CAP_SCREW1_D / 2, CSK_FOR_4_FLAT_HEAD_SOCKET_CAP_SCREW1_CSINK_D / 2, depth=CSK_FOR_4_FLAT_HEAD_SOCKET_CAP_SCREW1_DEPTH, counter_sink_angle=CSK_FOR_4_FLAT_HEAD_SOCKET_CAP_SCREW1_CSINK_ANGLE)
            with Locations((0, 0, -(CSK_FOR_4_FLAT_HEAD_SOCKET_CAP_SCREW1_DEPTH + CSK_FOR_4_FLAT_HEAD_SOCKET_CAP_SCREW1_TIP / 2))):  # 118° drill point
                Cone(0, CSK_FOR_4_FLAT_HEAD_SOCKET_CAP_SCREW1_D / 2, CSK_FOR_4_FLAT_HEAD_SOCKET_CAP_SCREW1_TIP, mode=Mode.SUBTRACT)

    # Chamfer7
    chamfer7_edges = [part.edges().sort_by_distance(p)[0] for p in [
        (-7.061766162, 0, -34.405993834),
        (-74.861766162, 0, -3.105993834),
        (60.738233838, 0, -3.105993834),
        (-7.061766162, 0, 28.194006166),
        (59.478792997, 0, 26.934565325),
        (-73.602325321, 0, 26.934565325),
        (-73.602325321, 0, -33.146552993),
        (59.478792997, 0, -33.146552993),
    ]]
    chamfer(chamfer7_edges, length=CHAMFER7_SIZE)

    # Chamfer8
    chamfer8_edges = [part.edges().sort_by_distance(p)[0] for p in [
        (-74.861766162, 2, -2.982922372),
    ]]
    chamfer(chamfer8_edges, length=CHAMFER8_SIZE - 0.0001)  # a hair under: the kernel refuses the full size

    # Sketch29 → Cut-Extrude3 (cut)
    with BuildSketch(Plane(origin=(0, 8.5, 0), x_dir=(1, 0, 0), z_dir=(0, 1, 0)).offset(CUT_EXTRUDE3_START)):
        with BuildLine():
            Line((53.938233838, 24.605993834), (58.438233838, 24.605993834))
            Line((58.438233838, 24.605993834), (58.438233838, 30.105993834))
            ThreePointArc((58.438233838, 30.105993834), (57.8524474, 31.520207397), (56.438233838, 32.105993834))
            Line((56.438233838, 32.105993834), (50.938233838, 32.105993834))
            Line((50.938233838, 32.105993834), (50.938233838, 27.605993834))
            ThreePointArc((50.938233838, 27.605993834), (56.059554181, 29.727314178), (53.938233838, 24.605993834))
        make_face()
        with BuildLine():
            Line((53.938233838, -18.394006166), (58.438233838, -18.394006166))
            Line((58.438233838, -18.394006166), (58.438233838, -23.894006166))
            ThreePointArc((58.438233838, -23.894006166), (57.8524474, -25.308219728), (56.438233838, -25.894006166))
            Line((56.438233838, -25.894006166), (50.938233838, -25.894006166))
            Line((50.938233838, -25.894006166), (50.938233838, -21.394006166))
            ThreePointArc((50.938233838, -21.394006166), (56.059554181, -23.515326509), (53.938233838, -18.394006166))
        make_face()
    extrude(amount=CUT_EXTRUDE3_DEPTH, mode=Mode.SUBTRACT)

    # Fillet21
    fillet21_edges = [part.edges().sort_by_distance(p)[0] for p in [
        (-54.861766162, 2.7, 26.894006166),
        (-66.861766162, 2.7, 26.894006166),
    ]]
    fillet(fillet21_edges, radius=FILLET21_R)

    # Chamfer9
    chamfer9_edges = [part.edges().sort_by_distance(p)[0] for p in [
        (-18.061766162, 5.4, 28.194006166),
        (-54.861766162, 6.6, 28.194006166),
        (-60.861766162, 2.7, 28.194006166),
        (-55.4475526, 3.285786438, 28.194006166),
        (-66.275979725, 3.285786438, 28.194006166),
        (-66.861766162, 6.6, 28.194006166),
        (-47.777982648, 7.1, 28.194006166),
        (-39.527982648, 5.7, 28.194006166),
        (-31.277982648, 7.1, 28.194006166),
    ]]
    chamfer(chamfer9_edges, length=CHAMFER9_SIZE)


solid = part.part
